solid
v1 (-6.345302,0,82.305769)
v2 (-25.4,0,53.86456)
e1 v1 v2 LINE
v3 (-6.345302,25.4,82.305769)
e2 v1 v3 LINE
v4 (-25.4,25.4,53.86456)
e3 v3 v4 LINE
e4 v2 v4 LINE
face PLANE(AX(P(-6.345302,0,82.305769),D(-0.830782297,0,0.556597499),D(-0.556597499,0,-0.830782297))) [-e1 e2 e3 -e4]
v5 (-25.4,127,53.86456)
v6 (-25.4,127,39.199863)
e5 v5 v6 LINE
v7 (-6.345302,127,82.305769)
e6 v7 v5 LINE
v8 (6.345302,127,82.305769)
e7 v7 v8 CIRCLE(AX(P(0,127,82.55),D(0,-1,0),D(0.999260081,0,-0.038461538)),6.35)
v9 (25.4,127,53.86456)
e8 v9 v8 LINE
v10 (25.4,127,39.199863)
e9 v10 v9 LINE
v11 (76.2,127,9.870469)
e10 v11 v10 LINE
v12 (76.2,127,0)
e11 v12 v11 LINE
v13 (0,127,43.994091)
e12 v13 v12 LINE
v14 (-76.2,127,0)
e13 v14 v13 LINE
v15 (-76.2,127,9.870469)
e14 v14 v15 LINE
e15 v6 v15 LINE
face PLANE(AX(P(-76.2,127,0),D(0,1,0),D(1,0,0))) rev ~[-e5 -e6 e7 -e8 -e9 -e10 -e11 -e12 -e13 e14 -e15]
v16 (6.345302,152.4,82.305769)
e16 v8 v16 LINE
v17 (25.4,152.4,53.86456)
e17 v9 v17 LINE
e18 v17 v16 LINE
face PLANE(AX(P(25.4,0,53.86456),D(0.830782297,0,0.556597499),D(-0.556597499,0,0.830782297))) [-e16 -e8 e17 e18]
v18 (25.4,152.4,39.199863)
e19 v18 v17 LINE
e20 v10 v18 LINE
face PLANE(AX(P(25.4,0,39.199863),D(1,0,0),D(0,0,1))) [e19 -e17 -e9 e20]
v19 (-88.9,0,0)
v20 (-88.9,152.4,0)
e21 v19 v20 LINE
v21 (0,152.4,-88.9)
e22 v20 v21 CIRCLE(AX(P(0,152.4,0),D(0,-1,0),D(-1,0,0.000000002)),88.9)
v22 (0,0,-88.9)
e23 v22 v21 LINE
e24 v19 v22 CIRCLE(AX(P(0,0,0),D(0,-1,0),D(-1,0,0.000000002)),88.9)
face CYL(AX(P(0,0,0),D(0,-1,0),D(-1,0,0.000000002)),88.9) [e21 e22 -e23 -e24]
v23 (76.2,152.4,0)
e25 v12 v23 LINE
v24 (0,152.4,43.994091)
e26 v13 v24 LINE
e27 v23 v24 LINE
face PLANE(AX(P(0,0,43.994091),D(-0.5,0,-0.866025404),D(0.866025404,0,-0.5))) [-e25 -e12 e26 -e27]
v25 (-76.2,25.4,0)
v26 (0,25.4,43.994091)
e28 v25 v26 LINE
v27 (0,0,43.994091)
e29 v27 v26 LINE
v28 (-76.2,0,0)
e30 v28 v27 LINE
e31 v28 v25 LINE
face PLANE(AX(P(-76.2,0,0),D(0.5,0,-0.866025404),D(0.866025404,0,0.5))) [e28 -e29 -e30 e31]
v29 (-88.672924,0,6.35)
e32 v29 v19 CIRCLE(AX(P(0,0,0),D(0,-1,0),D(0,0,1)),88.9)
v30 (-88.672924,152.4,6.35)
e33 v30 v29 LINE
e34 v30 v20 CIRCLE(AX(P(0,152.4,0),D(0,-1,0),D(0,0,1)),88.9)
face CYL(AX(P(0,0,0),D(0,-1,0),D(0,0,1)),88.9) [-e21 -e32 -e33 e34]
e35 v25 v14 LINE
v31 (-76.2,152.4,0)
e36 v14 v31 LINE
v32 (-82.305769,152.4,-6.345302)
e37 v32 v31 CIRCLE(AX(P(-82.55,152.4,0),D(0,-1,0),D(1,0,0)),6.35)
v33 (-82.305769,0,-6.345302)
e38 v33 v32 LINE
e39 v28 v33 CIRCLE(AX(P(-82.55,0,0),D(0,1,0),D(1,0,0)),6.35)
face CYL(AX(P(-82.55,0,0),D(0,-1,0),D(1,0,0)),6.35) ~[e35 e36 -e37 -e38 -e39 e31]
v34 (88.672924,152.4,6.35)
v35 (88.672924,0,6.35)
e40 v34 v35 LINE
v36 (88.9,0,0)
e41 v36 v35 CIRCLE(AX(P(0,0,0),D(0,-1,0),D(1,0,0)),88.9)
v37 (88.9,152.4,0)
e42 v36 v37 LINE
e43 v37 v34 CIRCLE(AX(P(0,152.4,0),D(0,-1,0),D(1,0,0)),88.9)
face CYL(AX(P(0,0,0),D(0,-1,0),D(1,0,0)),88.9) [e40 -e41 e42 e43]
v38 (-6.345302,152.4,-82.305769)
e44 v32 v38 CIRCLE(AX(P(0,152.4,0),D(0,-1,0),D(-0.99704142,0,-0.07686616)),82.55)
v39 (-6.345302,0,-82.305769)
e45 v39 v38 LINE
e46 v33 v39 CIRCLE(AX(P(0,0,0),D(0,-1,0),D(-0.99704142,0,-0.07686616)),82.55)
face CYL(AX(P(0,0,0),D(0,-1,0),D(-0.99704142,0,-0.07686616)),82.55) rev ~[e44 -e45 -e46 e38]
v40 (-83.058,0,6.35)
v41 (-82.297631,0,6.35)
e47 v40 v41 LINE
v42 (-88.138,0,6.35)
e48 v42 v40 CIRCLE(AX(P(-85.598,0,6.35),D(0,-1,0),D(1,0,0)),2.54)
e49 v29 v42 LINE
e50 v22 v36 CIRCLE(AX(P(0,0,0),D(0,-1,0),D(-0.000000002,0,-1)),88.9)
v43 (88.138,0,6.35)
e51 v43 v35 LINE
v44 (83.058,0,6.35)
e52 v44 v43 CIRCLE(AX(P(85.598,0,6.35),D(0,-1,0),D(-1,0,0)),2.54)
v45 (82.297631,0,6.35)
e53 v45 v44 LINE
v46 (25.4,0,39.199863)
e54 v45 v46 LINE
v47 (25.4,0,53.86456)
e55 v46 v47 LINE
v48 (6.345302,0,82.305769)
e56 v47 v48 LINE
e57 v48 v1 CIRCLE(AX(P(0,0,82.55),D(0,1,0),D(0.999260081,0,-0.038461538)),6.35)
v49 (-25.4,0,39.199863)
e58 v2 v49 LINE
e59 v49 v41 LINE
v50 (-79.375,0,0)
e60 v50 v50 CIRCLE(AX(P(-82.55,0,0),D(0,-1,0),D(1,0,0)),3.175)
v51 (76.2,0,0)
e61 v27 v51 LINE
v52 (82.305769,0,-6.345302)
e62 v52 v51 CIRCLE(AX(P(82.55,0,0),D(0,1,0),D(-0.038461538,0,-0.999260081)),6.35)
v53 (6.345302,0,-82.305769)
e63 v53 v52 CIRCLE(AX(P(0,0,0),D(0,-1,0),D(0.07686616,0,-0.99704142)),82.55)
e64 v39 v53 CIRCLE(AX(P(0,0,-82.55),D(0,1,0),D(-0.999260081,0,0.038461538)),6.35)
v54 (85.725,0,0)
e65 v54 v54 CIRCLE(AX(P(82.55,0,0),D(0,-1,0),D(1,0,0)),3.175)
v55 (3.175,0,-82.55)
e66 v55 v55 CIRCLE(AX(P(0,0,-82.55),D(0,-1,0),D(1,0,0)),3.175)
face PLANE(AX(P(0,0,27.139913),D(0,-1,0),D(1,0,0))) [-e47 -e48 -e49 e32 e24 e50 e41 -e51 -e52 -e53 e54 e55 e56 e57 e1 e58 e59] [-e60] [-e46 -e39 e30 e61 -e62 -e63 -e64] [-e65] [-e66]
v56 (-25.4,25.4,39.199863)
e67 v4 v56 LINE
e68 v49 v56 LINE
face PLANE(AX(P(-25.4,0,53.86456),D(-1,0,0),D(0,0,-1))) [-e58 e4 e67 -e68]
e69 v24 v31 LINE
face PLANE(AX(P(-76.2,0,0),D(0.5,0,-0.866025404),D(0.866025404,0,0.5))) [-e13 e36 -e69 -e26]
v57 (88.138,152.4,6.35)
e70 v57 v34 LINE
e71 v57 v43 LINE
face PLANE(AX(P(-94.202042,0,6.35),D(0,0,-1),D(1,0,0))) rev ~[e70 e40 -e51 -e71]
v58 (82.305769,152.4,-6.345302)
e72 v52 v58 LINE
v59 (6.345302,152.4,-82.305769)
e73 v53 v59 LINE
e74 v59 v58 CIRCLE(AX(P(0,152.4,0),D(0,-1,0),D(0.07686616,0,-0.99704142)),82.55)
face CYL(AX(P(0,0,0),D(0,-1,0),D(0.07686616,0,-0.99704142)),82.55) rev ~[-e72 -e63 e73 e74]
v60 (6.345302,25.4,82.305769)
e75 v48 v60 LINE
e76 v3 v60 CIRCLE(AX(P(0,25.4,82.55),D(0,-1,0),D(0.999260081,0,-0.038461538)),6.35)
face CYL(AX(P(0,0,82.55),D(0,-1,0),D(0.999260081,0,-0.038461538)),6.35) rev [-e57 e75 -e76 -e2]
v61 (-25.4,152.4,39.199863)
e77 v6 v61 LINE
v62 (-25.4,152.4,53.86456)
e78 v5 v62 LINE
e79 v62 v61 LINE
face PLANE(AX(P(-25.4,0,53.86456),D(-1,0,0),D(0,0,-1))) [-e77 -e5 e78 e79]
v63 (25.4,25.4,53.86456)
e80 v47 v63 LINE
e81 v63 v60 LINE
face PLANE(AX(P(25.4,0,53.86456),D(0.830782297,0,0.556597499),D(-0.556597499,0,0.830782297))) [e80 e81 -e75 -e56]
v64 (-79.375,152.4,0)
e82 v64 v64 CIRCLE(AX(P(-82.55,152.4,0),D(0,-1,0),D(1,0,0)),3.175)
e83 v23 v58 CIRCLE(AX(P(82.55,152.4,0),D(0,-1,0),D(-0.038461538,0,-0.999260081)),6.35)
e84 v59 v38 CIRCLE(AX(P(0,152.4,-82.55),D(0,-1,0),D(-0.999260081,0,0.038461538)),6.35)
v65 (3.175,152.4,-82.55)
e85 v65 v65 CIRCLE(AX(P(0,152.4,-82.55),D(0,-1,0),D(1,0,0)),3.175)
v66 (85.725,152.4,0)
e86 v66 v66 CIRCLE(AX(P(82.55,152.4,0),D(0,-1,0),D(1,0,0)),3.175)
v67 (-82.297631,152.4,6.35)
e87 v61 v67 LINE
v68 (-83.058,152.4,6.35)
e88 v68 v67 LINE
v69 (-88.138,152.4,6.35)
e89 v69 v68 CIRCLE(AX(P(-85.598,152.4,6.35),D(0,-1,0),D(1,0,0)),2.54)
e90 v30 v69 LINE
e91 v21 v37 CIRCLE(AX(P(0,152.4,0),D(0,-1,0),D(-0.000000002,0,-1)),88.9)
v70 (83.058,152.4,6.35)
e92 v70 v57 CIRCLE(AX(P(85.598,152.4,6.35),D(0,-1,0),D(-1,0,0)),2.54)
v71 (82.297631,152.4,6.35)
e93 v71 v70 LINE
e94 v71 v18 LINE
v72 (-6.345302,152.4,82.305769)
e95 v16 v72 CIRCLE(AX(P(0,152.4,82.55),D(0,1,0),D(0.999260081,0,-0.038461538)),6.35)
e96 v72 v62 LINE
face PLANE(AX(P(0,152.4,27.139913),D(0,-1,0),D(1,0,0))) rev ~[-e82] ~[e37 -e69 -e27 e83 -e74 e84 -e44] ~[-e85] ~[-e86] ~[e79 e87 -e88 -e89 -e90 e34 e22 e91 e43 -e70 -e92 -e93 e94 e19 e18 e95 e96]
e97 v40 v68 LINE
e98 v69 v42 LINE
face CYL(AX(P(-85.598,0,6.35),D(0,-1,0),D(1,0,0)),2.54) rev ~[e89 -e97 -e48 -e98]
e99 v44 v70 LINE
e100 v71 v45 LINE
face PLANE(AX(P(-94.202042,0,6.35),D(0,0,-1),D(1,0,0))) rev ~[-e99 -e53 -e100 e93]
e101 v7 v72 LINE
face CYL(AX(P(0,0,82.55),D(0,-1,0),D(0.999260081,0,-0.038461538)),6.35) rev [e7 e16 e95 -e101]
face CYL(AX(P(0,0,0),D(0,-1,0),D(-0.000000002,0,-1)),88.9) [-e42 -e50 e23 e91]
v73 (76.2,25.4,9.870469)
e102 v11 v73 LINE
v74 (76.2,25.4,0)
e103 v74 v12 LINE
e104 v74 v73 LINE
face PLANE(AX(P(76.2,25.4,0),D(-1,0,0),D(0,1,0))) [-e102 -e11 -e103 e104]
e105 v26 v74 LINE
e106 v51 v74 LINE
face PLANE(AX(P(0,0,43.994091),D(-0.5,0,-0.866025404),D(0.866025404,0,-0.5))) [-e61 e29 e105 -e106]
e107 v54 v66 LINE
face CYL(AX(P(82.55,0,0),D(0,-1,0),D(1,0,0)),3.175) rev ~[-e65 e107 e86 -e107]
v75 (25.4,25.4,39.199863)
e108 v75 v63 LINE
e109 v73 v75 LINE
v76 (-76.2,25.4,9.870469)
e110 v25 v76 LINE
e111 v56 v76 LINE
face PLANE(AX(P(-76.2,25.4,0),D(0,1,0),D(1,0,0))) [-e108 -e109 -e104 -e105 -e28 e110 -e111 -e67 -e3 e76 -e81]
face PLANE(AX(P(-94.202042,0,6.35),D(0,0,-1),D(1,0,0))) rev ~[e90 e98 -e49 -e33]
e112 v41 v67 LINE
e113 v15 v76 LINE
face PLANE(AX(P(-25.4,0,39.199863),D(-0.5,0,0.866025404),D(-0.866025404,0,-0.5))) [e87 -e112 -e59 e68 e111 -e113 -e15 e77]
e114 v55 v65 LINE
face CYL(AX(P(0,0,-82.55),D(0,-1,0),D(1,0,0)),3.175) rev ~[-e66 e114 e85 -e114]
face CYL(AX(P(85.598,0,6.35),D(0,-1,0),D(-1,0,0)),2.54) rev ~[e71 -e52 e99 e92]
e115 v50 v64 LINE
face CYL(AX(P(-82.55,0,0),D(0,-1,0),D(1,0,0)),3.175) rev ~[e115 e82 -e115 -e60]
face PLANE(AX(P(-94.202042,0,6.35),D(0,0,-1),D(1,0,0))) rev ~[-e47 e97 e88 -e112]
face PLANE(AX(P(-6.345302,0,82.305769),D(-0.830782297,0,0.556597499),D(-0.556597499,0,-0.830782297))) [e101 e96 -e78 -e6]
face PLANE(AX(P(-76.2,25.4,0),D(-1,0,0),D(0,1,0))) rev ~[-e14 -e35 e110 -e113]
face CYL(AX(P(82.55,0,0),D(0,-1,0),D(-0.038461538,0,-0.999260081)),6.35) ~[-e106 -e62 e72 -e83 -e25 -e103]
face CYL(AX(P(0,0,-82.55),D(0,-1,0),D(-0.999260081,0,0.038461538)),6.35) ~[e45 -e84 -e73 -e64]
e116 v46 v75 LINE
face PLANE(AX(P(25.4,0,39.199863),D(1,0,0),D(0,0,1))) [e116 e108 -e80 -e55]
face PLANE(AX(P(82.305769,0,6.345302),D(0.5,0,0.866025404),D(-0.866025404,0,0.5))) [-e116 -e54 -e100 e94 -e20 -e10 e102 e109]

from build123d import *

# Parameters (mm, degrees)
F1_DEPTH  = 152.4
F2_R      = 3.175
F3_DEPTH  = 152.401
F5_DEPTH  = 152.401
F6_R      = 2.54
F7_DEPTH  = 152.401
F8_DEPTH  = 152.4
F9_W      = 152.4
F9_H      = 101.6
F10_DEPTH = 82.3067692308


# Not quite as in the source:
# - a feature names something its author has since deleted; it is built from what else it names


with BuildPart() as f1:
    # F0 (on Front) → F1 (new body)
    with BuildSketch(Plane.XZ):
        with BuildLine():
            ThreePointArc((-2.11e-07, -88.9), (62.8617927729, -62.8617929221), (88.9, 0))
            ThreePointArc((88.9, 0), (62.8617928475, 62.8617928475), (0, 88.9))
            ThreePointArc((0, 88.9), (-62.8617927742, 62.8617929208), (-88.9, 2.073e-07))
            ThreePointArc((-88.9, 2.073e-07), (-62.8617929954, -62.8617926996), (-2.11e-07, -88.9))
        make_face()
    extrude(amount=-F1_DEPTH)

    # F2 (on face) → F3 (cut, through all)
    with BuildSketch(Plane.XZ):
        with Locations((0, -82.55)):
            Circle(F2_R)
        with Locations((82.55, 0)):
            Circle(F2_R)
        with Locations((-82.55, 0)):
            Circle(F2_R)
    extrude(amount=-F3_DEPTH, mode=Mode.SUBTRACT)

    # F4 (on face) → F5 (cut, through all)
    with BuildSketch(Plane.XZ):
        Polygon((-94.202041626, 6.35), (0, 6.35), (132.5988769531, 6.35), (114.2803505063, 107.1024313569), (-94.202041626, 107.1024313569), align=None)
    extrude(amount=-F5_DEPTH, mode=Mode.SUBTRACT)

    # F6 (on face) + F2 (on face) → F7 (cut, through all)
    with BuildSketch(Plane.XZ):
        with Locations((-85.598, 6.35)):
            Circle(F6_R)
        with BuildLine():
            ThreePointArc((88.138, 6.35), (85.598, 8.89), (83.058, 6.35))
            ThreePointArc((83.058, 6.35), (85.598, 3.81), (88.138, 6.35))
        make_face()
    with BuildSketch(Plane.XZ):
        with BuildLine():
            Line((0, 43.9940905122), (-76.2, 0))
            ThreePointArc((-76.2, 0), (-77.974338005, -4.4029328075), (-82.3057692308, -6.3453015162))
            ThreePointArc((-82.3057692308, -6.3453015162), (-58.3716647869, -58.3716647869), (-6.3453015162, -82.3057692308))
            ThreePointArc((-6.3453015162, -82.3057692308), (0, -76.2), (6.3453015162, -82.3057692308))
            ThreePointArc((6.3453015162, -82.3057692308), (58.3716647869, -58.3716647869), (82.3057692308, -6.3453015162))
            ThreePointArc((82.3057692308, -6.3453015162), (77.974338005, -4.4029328075), (76.2, 0))
            Line((76.2, 0), (0, 43.9940905122))
        make_face()
    extrude(amount=-F7_DEPTH, mode=Mode.SUBTRACT)

    # F2 (on face) → F8 (join)
    with BuildSketch(Plane.XZ):
        with BuildLine():
            Line((0, 53.8645595374), (-25.4, 53.8645595374))
            Line((-25.4, 53.8645595374), (-25.4, 39.1998627))
            Line((-25.4, 39.1998627), (-82.3057692308, 6.3453015162))
            ThreePointArc((-82.3057692308, 6.3453015162), (-77.974338005, 4.4029328075), (-76.2, 0))
            Line((-76.2, 0), (0, 43.9940905122))
            Line((0, 43.9940905122), (76.2, 0))
            ThreePointArc((76.2, 0), (77.974338005, 4.4029328075), (82.3057692308, 6.3453015162))
            Line((82.3057692308, 6.3453015162), (25.4, 39.1998627))
            Line((25.4, 39.1998627), (25.4, 53.8645595374))
            Line((25.4, 53.8645595374), (0, 53.8645595374))
        make_face()
        with BuildLine():
            ThreePointArc((6.3453015162, 82.3057692308), (0, 76.2), (-6.3453015162, 82.3057692308))
            Line((-6.3453015162, 82.3057692308), (-25.4, 53.8645595374))
            Line((-25.4, 53.8645595374), (0, 53.8645595374))
            Line((0, 53.8645595374), (25.4, 53.8645595374))
            Line((25.4, 53.8645595374), (6.3453015162, 82.3057692308))
        make_face()
    extrude(amount=-F8_DEPTH)

    # F9 (on Top) → F10 (cut, through all)
    with BuildSketch(Plane.XY):
        with Locations((0, 76.2)):
            Rectangle(F9_W, F9_H)
    extrude(amount=F10_DEPTH, mode=Mode.SUBTRACT)


solid = f1.part
